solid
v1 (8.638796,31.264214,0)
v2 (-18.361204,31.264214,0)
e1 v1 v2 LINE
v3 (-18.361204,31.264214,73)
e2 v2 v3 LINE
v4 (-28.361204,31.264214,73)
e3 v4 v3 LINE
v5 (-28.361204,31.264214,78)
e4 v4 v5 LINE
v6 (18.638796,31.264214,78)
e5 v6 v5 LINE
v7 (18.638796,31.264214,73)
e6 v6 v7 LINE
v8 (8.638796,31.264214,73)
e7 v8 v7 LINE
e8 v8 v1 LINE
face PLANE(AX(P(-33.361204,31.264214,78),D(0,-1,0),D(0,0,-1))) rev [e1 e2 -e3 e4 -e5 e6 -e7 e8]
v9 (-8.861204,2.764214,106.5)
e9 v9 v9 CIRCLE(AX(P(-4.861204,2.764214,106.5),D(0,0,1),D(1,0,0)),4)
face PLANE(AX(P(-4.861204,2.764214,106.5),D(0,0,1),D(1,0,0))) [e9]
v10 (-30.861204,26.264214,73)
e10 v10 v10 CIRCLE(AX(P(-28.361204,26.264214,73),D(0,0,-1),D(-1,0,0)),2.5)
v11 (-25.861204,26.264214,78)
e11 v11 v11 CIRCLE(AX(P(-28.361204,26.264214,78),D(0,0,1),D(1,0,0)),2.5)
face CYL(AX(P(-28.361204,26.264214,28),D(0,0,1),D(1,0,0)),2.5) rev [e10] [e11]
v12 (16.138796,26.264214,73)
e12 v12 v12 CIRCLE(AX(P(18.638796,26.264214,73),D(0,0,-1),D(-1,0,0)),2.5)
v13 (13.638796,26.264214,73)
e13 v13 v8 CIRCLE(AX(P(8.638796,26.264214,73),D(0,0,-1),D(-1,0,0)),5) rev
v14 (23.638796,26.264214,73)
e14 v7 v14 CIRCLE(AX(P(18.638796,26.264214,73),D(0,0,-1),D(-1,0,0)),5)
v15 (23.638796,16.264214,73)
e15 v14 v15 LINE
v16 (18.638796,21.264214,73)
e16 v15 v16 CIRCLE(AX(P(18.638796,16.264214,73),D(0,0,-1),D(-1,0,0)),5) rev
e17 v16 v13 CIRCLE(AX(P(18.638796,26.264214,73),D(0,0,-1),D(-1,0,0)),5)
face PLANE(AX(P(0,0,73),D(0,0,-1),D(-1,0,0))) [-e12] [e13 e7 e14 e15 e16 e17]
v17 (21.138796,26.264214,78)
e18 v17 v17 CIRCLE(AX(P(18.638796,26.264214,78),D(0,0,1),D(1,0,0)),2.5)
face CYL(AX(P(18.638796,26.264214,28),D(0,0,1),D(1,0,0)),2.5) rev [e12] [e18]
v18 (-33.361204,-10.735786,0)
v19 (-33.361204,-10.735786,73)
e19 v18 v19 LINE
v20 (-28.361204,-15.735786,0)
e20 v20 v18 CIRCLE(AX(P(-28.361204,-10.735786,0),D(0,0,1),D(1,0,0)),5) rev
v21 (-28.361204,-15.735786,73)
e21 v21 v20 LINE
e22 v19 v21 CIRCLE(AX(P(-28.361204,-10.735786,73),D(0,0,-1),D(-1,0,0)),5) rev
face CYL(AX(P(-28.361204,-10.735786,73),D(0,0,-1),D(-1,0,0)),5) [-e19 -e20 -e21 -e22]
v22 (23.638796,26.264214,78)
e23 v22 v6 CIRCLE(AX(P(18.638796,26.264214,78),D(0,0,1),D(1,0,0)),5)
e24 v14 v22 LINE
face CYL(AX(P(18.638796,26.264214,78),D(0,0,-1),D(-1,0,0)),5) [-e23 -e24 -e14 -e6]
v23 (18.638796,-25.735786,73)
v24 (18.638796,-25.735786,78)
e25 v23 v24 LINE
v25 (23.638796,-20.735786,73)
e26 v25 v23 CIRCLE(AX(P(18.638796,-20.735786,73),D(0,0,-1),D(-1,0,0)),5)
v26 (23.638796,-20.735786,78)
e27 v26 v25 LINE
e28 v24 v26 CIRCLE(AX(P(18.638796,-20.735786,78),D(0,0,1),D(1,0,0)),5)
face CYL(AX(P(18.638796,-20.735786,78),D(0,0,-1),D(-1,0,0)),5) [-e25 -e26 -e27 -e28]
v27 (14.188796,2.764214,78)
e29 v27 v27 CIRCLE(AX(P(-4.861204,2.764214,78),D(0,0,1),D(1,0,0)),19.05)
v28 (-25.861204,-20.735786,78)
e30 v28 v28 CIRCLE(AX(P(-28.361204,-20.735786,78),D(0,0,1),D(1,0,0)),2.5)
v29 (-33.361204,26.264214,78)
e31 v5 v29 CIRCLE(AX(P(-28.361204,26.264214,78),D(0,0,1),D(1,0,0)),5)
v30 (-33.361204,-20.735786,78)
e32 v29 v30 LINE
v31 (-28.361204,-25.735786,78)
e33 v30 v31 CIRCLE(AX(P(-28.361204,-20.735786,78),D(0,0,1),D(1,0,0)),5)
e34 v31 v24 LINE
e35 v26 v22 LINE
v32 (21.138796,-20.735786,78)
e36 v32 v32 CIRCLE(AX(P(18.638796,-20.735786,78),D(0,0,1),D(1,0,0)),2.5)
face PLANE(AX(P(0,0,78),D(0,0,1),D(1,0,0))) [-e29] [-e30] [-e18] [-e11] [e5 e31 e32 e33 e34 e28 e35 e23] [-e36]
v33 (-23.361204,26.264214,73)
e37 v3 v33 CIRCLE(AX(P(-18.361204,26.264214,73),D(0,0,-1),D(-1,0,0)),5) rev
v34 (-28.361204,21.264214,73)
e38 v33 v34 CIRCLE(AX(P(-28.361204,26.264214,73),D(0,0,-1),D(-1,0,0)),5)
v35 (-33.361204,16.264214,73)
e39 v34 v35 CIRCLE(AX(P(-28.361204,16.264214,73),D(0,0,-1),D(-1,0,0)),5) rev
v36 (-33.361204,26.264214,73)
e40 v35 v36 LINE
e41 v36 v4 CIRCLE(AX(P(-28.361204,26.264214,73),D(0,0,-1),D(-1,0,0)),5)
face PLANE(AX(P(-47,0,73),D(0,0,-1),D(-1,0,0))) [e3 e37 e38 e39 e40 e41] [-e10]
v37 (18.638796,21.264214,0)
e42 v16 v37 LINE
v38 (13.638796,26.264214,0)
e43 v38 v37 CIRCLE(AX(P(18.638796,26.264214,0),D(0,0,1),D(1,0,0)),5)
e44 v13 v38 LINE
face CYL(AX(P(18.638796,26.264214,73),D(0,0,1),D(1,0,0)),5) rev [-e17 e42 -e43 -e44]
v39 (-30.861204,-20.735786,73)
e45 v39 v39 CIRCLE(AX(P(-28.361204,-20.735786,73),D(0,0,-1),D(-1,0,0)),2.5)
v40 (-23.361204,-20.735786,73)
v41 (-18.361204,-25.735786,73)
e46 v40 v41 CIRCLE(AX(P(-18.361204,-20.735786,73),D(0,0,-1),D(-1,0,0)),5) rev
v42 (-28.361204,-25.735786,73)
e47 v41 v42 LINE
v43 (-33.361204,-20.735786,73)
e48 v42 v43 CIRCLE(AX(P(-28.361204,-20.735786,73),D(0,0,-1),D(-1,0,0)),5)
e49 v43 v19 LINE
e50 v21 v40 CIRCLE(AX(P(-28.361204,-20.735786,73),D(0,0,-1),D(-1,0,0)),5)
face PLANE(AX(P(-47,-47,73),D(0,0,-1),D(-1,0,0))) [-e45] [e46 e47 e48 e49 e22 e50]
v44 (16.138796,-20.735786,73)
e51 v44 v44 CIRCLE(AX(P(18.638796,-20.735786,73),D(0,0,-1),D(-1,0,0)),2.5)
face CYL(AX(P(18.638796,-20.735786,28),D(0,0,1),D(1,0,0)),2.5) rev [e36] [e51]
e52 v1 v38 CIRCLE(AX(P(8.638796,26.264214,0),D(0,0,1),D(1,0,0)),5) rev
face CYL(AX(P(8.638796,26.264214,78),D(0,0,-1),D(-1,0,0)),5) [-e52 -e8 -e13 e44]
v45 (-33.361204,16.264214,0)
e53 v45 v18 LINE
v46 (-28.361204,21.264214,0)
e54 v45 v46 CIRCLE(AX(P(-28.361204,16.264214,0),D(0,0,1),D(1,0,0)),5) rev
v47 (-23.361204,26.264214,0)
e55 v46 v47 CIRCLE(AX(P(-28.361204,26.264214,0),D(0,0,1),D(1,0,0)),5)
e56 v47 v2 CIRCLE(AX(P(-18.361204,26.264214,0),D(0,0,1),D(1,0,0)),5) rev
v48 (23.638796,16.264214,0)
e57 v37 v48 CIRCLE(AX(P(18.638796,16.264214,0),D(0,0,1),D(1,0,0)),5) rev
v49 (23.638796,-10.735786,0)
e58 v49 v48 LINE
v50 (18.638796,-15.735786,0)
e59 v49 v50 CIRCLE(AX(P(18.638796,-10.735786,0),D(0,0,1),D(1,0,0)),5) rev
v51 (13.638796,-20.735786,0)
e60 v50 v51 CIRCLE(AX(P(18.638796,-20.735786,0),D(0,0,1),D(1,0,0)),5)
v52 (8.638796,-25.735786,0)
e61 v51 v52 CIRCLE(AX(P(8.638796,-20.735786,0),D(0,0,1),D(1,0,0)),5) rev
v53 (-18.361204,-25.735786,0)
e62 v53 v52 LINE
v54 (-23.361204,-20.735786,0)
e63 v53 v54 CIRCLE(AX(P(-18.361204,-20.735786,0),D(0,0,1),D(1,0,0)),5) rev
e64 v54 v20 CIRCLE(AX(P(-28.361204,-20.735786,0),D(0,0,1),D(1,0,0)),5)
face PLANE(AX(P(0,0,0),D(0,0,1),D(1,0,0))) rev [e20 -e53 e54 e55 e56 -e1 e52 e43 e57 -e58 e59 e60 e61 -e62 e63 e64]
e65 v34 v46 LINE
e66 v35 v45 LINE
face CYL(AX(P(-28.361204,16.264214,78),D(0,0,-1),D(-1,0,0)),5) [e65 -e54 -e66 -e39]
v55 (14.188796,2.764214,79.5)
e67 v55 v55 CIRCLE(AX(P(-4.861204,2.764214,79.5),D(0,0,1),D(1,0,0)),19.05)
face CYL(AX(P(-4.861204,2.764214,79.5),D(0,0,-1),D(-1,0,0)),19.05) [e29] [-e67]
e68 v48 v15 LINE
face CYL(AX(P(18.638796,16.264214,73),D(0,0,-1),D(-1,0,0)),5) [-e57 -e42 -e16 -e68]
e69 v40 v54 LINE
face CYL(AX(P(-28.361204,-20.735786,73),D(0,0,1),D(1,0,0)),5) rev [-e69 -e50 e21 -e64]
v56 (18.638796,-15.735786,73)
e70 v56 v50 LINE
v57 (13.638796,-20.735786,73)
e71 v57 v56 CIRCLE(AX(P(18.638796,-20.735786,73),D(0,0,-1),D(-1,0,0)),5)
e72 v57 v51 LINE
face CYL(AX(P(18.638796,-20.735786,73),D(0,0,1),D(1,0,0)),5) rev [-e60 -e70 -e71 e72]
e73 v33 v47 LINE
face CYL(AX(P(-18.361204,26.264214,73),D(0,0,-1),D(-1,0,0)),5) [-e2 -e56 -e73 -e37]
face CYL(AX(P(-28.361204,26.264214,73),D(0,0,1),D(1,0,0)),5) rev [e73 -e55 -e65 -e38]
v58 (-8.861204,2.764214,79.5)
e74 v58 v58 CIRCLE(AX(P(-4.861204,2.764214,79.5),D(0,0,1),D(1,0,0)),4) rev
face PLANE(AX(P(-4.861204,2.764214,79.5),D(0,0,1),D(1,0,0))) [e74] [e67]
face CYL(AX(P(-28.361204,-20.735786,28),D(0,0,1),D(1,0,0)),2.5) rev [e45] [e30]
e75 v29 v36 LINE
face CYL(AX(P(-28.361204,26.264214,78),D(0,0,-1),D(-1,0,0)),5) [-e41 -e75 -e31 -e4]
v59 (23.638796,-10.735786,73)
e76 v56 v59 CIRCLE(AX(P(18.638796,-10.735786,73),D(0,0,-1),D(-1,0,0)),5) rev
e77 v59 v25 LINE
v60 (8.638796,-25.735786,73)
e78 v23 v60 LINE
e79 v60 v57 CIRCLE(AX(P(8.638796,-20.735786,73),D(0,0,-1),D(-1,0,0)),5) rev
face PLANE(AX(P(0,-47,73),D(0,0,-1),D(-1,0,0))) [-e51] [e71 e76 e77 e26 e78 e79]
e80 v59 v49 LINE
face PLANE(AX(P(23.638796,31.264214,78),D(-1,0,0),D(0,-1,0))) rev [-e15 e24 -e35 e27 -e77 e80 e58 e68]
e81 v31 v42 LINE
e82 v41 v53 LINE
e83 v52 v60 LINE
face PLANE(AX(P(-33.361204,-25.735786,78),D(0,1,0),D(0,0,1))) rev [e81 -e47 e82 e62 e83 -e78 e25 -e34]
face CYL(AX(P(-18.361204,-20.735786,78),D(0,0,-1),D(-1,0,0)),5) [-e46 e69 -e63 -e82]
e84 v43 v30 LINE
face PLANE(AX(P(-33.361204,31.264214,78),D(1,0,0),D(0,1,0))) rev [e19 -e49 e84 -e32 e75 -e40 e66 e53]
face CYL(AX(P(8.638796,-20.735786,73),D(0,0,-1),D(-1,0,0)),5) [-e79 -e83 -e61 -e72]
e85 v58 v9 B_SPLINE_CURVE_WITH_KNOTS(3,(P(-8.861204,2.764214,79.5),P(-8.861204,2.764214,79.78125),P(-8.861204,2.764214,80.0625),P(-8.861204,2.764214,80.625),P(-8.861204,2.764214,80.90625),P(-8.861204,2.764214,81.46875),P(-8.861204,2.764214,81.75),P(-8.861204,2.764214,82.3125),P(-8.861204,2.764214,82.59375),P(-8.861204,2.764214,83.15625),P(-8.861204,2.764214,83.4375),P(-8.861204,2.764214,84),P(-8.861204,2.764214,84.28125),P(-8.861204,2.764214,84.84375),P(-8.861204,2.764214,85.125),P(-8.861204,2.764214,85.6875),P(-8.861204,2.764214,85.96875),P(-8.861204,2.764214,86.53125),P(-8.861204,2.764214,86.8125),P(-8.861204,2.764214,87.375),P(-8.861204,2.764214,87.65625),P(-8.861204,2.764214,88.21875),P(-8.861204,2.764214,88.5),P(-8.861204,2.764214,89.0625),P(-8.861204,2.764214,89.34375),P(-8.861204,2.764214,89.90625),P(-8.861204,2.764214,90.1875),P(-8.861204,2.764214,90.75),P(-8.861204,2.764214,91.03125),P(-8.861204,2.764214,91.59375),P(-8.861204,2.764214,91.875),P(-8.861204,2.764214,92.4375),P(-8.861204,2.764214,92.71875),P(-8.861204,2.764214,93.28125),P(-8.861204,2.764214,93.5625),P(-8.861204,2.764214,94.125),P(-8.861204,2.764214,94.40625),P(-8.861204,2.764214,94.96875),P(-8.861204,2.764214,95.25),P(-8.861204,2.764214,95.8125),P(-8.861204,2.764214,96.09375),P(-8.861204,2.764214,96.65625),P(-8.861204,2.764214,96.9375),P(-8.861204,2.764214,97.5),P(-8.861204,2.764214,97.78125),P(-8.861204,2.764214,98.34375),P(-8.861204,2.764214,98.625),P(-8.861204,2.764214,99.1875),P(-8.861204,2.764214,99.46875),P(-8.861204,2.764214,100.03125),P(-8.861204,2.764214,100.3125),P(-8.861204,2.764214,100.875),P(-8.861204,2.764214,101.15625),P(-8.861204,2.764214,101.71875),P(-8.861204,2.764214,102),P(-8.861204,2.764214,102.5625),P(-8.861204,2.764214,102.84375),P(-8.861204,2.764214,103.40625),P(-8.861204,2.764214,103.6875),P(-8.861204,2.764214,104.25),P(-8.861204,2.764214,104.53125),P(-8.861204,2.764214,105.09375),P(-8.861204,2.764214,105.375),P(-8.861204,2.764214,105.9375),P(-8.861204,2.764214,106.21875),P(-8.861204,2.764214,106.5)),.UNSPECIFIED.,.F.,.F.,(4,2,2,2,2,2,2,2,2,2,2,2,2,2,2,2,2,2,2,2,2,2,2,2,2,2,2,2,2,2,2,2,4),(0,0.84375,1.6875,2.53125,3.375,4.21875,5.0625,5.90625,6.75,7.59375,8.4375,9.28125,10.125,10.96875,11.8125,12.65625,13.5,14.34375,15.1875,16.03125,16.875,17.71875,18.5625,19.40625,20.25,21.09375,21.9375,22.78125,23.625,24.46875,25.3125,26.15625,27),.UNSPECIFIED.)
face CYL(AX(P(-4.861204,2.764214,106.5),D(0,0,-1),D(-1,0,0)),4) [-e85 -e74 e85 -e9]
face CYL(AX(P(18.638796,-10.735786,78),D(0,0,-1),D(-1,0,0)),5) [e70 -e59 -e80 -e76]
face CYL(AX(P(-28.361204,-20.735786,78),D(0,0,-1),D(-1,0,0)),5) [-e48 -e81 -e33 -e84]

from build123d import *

# Parameters (mm, degrees)
SKETCH1_W            = 57
SKETCH1_H            = 57
BOSS_EXTRUDE1_DEPTH  = 78
SKETCH2_W            = 10
SKETCH2_H            = 10
CUT_EXTRUDE1_DEPTH   = 73
LPATTERN1_COUNT      = 2
LPATTERN1_PITCH      = 47
LPATTERN1_COUNT_DIR2 = 2
LPATTERN1_PITCH_DIR2 = 47
SKETCH3_R            = 2.5
CUT_EXTRUDE2_DEPTH   = 50
LPATTERN2_COUNT      = 2
LPATTERN2_PITCH      = 47
LPATTERN2_COUNT_DIR2 = 2
LPATTERN2_PITCH_DIR2 = 47
FILLET1_R            = 5
SKETCH5_R            = 19.05
BOSS_EXTRUDE3_DEPTH  = 1.5
SKETCH4_R            = 4
BOSS_EXTRUDE2_DEPTH  = 28.5


with BuildPart() as part:
    # Sketch1 → Boss-Extrude1 (new body)
    with BuildSketch(Plane.XY):
        with Locations((-4.861204013, 2.764214047)):
            Rectangle(SKETCH1_W, SKETCH1_H)
    extrude(amount=BOSS_EXTRUDE1_DEPTH)

    # Sketch2 → Cut-Extrude1 (cut)
    with BuildSketch(Plane(origin=(0, 0, 0), x_dir=(-1, 0, 0), z_dir=(0, 0, -1))):
        with Locations((-18.638795987, 26.264214047)):
            Rectangle(SKETCH2_W, SKETCH2_H)
    cut_extrude1 = extrude(amount=-CUT_EXTRUDE1_DEPTH, mode=Mode.SUBTRACT)

    # LPattern1: Cut-Extrude1 2 × 2
    with Locations(*[(-i * LPATTERN1_PITCH, -j * LPATTERN1_PITCH_DIR2, 0) for i in range(LPATTERN1_COUNT) for j in range(LPATTERN1_COUNT_DIR2) if (i, j) != (0, 0)]):
        add(cut_extrude1, mode=Mode.SUBTRACT)

    # Sketch3 → Cut-Extrude2 (cut)
    with BuildSketch(Plane.XY.offset(78)):
        with Locations((-28.361204013, 26.264214047)):
            Circle(SKETCH3_R)
    cut_extrude2 = extrude(amount=-CUT_EXTRUDE2_DEPTH, mode=Mode.SUBTRACT)

    # LPattern2: Cut-Extrude2 2 × 2
    with Locations(*[(i * LPATTERN2_PITCH, -j * LPATTERN2_PITCH_DIR2, 0) for i in range(LPATTERN2_COUNT) for j in range(LPATTERN2_COUNT_DIR2) if (i, j) != (0, 0)]):
        add(cut_extrude2, mode=Mode.SUBTRACT)

    # Fillet1
    fillet1_edges = [part.edges().sort_by_distance(p)[0] for p in [
        (-33.361204013, 21.264214047, 36.5),
        (-23.361204013, 21.264214047, 36.5),
        (-23.361204013, 31.264214047, 36.5),
        (13.638795987, 31.264214047, 36.5),
        (13.638795987, 21.264214047, 36.5),
        (23.638795987, 21.264214047, 36.5),
        (23.638795987, -25.735785953, 75.5),
        (23.638795987, -15.735785953, 36.5),
        (13.638795987, -15.735785953, 36.5),
        (13.638795987, -25.735785953, 36.5),
        (-23.361204013, -25.735785953, 36.5),
        (-23.361204013, -15.735785953, 36.5),
        (-33.361204013, -15.735785953, 36.5),
        (-33.361204013, -25.735785953, 75.5),
        (-33.361204013, 31.264214047, 75.5),
        (23.638795987, 31.264214047, 75.5),
    ]]
    fillet(fillet1_edges, radius=FILLET1_R - 0.0001)  # a hair under: the kernel refuses the full size

    # Sketch5 → Boss-Extrude3 (add)
    with BuildSketch(Plane.XY.offset(78)):
        with Locations((-4.861204013, 2.764214047)):
            Circle(SKETCH5_R)
    extrude(amount=BOSS_EXTRUDE3_DEPTH)

    # Sketch4 → Boss-Extrude2 (add)
    with BuildSketch(Plane.XY.offset(78)):
        with Locations(Location((-4.861204013, 2.764214047, 0), (0, 0, 180))):
            Circle(SKETCH4_R)
    extrude(amount=BOSS_EXTRUDE2_DEPTH)


solid = part.part
